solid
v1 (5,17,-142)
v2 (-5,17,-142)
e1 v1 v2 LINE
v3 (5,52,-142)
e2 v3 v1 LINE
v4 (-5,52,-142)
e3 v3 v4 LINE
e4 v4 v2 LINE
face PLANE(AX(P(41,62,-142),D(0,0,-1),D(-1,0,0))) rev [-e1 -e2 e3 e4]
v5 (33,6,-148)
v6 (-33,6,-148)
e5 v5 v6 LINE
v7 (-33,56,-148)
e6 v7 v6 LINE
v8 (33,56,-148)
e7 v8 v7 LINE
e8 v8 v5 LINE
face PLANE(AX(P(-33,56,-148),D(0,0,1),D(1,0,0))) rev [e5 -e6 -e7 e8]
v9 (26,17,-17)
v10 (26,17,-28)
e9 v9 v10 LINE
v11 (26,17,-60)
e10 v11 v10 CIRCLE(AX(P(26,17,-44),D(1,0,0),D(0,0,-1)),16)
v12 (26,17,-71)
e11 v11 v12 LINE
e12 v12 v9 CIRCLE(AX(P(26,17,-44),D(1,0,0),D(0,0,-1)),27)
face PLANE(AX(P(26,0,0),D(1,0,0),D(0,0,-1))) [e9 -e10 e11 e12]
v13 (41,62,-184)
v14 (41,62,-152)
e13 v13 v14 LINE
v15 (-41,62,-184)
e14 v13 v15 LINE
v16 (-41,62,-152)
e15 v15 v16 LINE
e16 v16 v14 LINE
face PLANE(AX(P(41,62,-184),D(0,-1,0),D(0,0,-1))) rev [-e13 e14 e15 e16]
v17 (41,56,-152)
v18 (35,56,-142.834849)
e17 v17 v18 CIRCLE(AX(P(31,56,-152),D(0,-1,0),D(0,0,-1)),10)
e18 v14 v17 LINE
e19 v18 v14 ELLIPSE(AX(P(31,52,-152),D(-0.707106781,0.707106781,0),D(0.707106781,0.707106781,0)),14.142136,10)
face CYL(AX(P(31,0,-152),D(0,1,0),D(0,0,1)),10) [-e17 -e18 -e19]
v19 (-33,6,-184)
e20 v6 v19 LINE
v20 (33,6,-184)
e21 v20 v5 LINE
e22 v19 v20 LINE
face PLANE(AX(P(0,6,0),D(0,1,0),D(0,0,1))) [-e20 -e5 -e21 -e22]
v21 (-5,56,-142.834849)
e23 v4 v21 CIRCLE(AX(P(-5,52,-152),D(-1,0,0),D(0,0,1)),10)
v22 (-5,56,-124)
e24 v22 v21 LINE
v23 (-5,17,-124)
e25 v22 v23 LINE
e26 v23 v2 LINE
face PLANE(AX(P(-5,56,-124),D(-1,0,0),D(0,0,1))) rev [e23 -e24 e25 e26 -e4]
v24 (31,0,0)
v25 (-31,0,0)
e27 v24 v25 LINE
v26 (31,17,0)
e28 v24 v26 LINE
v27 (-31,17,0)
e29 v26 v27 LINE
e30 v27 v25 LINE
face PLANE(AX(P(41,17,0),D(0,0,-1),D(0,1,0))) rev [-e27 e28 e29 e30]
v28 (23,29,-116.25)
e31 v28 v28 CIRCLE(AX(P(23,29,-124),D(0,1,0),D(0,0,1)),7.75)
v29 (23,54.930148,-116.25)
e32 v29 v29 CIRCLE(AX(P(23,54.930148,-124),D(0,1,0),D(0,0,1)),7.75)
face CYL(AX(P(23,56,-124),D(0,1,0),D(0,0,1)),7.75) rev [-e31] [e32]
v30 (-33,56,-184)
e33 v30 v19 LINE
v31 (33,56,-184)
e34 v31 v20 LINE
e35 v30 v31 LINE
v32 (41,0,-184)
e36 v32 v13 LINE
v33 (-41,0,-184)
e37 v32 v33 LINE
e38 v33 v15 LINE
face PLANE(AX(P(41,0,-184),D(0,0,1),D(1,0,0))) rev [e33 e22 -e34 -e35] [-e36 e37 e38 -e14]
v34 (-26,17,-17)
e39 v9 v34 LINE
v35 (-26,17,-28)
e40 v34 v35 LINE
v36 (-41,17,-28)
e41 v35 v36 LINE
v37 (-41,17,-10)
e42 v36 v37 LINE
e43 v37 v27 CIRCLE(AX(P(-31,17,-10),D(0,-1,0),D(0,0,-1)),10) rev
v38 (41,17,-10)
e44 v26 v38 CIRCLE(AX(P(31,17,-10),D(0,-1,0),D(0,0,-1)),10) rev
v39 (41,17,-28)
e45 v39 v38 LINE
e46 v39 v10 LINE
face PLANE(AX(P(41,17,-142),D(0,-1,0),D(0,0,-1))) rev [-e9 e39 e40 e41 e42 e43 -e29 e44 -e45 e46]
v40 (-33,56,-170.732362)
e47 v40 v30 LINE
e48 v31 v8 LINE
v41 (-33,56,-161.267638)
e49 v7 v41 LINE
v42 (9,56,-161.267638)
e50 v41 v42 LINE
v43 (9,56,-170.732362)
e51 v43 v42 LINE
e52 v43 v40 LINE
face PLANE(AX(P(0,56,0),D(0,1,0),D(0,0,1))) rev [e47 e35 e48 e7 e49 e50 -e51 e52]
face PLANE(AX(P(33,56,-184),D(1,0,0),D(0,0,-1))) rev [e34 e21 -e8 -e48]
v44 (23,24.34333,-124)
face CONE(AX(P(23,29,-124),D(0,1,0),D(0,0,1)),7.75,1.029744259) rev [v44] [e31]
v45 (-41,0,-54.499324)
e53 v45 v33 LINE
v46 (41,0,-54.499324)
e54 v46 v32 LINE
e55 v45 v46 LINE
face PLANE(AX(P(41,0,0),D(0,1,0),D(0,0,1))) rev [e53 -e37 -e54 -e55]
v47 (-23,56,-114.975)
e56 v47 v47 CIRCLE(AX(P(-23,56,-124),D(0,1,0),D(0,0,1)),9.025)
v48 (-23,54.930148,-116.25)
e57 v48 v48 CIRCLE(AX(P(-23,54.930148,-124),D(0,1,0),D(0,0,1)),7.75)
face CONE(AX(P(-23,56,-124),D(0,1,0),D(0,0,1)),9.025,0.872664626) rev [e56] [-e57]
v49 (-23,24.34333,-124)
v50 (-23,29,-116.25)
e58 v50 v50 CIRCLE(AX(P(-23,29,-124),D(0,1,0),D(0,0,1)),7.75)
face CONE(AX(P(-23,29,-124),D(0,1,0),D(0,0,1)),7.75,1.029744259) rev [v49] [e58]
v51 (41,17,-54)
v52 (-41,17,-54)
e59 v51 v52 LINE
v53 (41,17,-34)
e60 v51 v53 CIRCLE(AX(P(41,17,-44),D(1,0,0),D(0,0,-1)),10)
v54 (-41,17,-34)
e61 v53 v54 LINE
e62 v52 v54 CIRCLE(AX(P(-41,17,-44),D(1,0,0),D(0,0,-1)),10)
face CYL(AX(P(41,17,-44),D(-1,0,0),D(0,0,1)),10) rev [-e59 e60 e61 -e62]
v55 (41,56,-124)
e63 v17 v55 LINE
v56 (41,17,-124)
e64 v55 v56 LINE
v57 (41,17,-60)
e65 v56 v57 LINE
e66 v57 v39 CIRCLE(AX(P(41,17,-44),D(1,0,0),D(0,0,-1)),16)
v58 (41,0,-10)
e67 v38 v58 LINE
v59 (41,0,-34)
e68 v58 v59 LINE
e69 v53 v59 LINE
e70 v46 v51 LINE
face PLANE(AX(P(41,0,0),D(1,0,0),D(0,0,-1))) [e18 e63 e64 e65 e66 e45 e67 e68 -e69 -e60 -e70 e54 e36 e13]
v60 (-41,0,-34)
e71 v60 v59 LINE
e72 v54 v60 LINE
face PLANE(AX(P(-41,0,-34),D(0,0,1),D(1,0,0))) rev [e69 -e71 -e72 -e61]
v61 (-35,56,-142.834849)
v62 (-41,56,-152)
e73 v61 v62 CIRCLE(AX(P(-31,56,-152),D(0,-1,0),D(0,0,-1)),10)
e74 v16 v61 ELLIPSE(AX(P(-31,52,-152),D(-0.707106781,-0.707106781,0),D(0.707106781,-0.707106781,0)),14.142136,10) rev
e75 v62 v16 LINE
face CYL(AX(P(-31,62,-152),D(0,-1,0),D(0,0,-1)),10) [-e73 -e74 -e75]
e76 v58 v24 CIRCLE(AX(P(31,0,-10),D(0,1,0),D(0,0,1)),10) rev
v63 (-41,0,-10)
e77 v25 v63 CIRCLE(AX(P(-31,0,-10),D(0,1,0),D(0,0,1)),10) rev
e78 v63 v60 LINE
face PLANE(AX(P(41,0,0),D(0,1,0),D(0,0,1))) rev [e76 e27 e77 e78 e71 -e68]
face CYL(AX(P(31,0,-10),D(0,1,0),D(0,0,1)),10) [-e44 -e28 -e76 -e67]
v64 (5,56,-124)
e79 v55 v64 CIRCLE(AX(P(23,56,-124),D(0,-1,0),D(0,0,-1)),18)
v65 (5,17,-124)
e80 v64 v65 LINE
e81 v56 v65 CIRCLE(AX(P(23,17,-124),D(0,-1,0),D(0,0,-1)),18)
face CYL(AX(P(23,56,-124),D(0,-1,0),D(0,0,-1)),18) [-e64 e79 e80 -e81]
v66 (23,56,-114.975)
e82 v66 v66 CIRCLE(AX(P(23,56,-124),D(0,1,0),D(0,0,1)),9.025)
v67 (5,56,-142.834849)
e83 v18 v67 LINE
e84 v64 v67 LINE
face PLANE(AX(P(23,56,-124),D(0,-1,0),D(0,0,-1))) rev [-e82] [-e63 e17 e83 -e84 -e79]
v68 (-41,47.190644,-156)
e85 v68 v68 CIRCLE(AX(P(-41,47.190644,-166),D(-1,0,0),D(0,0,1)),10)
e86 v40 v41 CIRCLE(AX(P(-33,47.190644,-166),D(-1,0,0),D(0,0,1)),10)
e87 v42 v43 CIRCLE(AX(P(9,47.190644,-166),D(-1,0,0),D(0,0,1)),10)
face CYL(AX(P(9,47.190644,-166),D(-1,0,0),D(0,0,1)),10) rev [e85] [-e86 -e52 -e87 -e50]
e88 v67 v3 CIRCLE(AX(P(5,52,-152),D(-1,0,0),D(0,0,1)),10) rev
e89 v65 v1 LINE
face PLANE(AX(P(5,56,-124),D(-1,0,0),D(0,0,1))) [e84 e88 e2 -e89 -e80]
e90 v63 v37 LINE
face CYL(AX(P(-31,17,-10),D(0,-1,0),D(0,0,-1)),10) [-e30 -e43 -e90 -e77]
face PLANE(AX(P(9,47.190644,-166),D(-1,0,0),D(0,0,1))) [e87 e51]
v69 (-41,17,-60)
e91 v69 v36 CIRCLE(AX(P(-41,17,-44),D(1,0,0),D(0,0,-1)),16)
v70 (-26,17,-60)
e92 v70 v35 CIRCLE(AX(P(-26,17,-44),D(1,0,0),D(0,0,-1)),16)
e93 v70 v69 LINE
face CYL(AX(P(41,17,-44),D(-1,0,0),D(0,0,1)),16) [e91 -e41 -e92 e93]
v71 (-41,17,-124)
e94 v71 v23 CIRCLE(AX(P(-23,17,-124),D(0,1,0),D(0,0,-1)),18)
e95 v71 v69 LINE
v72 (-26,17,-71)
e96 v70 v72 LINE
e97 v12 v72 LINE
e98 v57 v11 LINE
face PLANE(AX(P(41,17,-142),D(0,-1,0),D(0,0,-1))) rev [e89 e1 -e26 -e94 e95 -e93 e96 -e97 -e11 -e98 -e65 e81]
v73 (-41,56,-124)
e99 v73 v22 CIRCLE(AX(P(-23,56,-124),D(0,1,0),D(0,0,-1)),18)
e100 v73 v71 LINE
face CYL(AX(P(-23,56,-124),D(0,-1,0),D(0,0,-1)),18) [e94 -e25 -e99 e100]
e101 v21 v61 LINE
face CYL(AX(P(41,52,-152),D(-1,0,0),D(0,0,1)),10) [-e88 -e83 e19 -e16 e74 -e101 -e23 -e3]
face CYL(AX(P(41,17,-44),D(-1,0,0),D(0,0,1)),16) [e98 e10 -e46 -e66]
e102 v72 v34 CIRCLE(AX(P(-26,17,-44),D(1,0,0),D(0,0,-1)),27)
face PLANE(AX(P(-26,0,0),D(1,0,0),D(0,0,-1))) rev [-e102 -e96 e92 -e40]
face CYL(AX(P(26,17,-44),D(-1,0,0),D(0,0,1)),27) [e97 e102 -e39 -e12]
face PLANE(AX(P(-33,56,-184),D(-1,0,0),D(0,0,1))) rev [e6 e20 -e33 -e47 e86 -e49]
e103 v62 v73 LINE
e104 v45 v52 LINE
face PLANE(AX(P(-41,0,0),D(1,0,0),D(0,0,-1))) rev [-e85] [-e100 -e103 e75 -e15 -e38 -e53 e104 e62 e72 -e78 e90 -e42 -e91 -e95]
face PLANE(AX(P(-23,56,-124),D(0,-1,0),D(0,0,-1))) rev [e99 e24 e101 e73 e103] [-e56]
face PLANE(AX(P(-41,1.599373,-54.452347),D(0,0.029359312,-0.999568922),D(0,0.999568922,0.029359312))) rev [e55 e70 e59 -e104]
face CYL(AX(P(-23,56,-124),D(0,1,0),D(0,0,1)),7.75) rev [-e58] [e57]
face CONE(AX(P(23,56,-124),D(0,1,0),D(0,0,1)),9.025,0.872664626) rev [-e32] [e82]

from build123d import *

# Parameters (mm, degrees)
BOSS_EXTRUDE2_DEPTH      = 41
BOSS_EXTRUDE4_DEPTH      = 39
BOSS_EXTRUDE6_DEPTH      = 41
BOSS_EXTRUDE6_DEPTH_BACK = 41
BOSS_EXTRUDE7_DEPTH      = 26
CUT_EXTRUDE1_DEPTH       = 211.770016843
CUT_EXTRUDE5_START       = -6
SKETCH12_W               = 66
SKETCH12_H               = 36
CUT_EXTRUDE5_DEPTH       = 50
FILLET1_R                = 10
SKETCH13_R               = 10
CUT_EXTRUDE6_DEPTH       = 50


with BuildPart() as part:
    # Sketch3 → Boss-Extrude2 (new, symmetric)
    with BuildSketch(Plane(origin=(0, 0, 0), x_dir=(0, 0, -1), z_dir=(1, 0, 0))):
        Polygon((0, 0), (184, 0), (184, 62), (142, 62), (142, 17), (0, 17), align=None)
    extrude(amount=BOSS_EXTRUDE2_DEPTH, both=True)

    # Sketch4 → Boss-Extrude4 (add)
    with BuildSketch(Plane(origin=(0, 17, 0), x_dir=(1, 0, 0), z_dir=(0, 1, 0))):
        with BuildLine():
            Line((41, 142), (41, 124))
            ThreePointArc((41, 124), (23, 106), (5, 124))
            Line((5, 124), (5, 142))
            Line((5, 142), (41, 142))
        make_face()
    boss_extrude4 = extrude(amount=BOSS_EXTRUDE4_DEPTH)

    # Sketch6 → M18 Tapped Hole1 (revolve, cut)
    with BuildSketch(Plane(origin=(23, 56, -124), x_dir=(0, 0, 1), z_dir=(1, 0, 0))):
        Polygon((0, 0), (0, 31.656669797), (7.75, 27), (7.75, 1.06985203), (9.025, 0), align=None)
    m18_tapped_hole1 = revolve(axis=Axis((23, 62.35, -124), (0, -1, 0)), mode=Mode.SUBTRACT)

    # Mirror1: Boss-Extrude4, M18 Tapped Hole1 across plane
    add(boss_extrude4.mirror(Plane(origin=(0, 0, 0), x_dir=(0, 0, 1), z_dir=(1, 0, 0))))
    add(m18_tapped_hole1.mirror(Plane(origin=(0, 0, 0), x_dir=(0, 0, 1), z_dir=(1, 0, 0))), mode=Mode.SUBTRACT)

    # Sketch10 → Boss-Extrude6 (add, two sides: drawn at the far end of the back side and taken through both)
    with BuildSketch(Plane(origin=(0, 0, 0), x_dir=(0, 0, -1), z_dir=(1, 0, 0)).offset(-BOSS_EXTRUDE6_DEPTH_BACK)):
        with BuildLine():
            ThreePointArc((60, 17), (44, 33), (28, 17))
            Line((28, 17), (34, 17))
            ThreePointArc((34, 17), (44, 27), (54, 17))
            Line((54, 17), (60, 17))
        make_face()
    extrude(amount=BOSS_EXTRUDE6_DEPTH + BOSS_EXTRUDE6_DEPTH_BACK)

    # Sketch10<3> → Boss-Extrude7 (add, symmetric)
    with BuildSketch(Plane(origin=(0, 0, 0), x_dir=(0, 0, -1), z_dir=(1, 0, 0))):
        with BuildLine():
            ThreePointArc((71, 17), (44, 44), (17, 17))
            Line((17, 17), (28, 17))
            ThreePointArc((28, 17), (44, 33), (60, 17))
            Line((60, 17), (71, 17))
        make_face()
    extrude(amount=BOSS_EXTRUDE7_DEPTH, both=True)

    # Sketch11 → Cut-Extrude1 (cut, through all)
    with BuildSketch(Plane(origin=(41, 0, 0), x_dir=(0, 0, -1), z_dir=(1, 0, 0))):
        Polygon((54, 17), (34, 17), (34, 0), (54.499323558, 0), align=None)
        with BuildLine():
            ThreePointArc((54, 17), (44, 26.710592894), (34, 17))
            Line((34, 17), (54, 17))
        make_face()
    extrude(amount=-CUT_EXTRUDE1_DEPTH, mode=Mode.SUBTRACT)

    # Sketch12 → Cut-Extrude5 (cut)
    with BuildSketch(Plane.XZ.offset(CUT_EXTRUDE5_START)):
        with Locations((0, -166)):
            Rectangle(SKETCH12_W, SKETCH12_H)
    extrude(amount=-CUT_EXTRUDE5_DEPTH, mode=Mode.SUBTRACT)

    # Fillet1
    # the kernel refuses this fillet: 10 mm, written as the material it takes off along each edge
    with BuildSketch(Plane(origin=(-66, 62, -142), x_dir=(0, -1, 0), z_dir=(1, 0, 0))) as fillet1_piece_1_section:
        with BuildLine():
            CenterArc((FILLET1_R, FILLET1_R), FILLET1_R, 180, 90)
            Line((0, FILLET1_R), (0, 0))
            Line((0, 0), (FILLET1_R, 0))
        make_face()
    fillet1_piece_1 = extrude(amount=132, mode=Mode.PRIVATE)
    fillet1_piece_1 = split(fillet1_piece_1, bisect_by=Plane(origin=(-35.5, 56, -144.437451755), z_dir=(0, 1, 0)), keep=Keep.TOP, mode=Mode.PRIVATE)
    fillet1_piece_1 = split(fillet1_piece_1, bisect_by=Plane(origin=(-5, 60.149499364, -144.437451755), z_dir=(-1, 0, 0)), keep=Keep.TOP, mode=Mode.PRIVATE)
    add(fillet1_piece_1, mode=Mode.SUBTRACT)
    with BuildSketch(Plane(origin=(-66, 62, -142), x_dir=(0, -1, 0), z_dir=(1, 0, 0))) as fillet1_piece_2_section:
        with BuildLine():
            CenterArc((FILLET1_R, FILLET1_R), FILLET1_R, 180, 90)
            Line((0, FILLET1_R), (0, 0))
            Line((0, 0), (FILLET1_R, 0))
        make_face()
    fillet1_piece_2 = extrude(amount=132, mode=Mode.PRIVATE)
    fillet1_piece_2 = split(fillet1_piece_2, bisect_by=Plane(origin=(0, 56, -142.10131848), z_dir=(0, -1, 0)), keep=Keep.TOP, mode=Mode.PRIVATE)
    fillet1_piece_2 = split(fillet1_piece_2, bisect_by=Plane(origin=(5, 54.582513339, -142.10131848), z_dir=(-1, 0, 0)), keep=Keep.TOP, mode=Mode.PRIVATE)
    fillet1_piece_2 = split(fillet1_piece_2, bisect_by=Plane(origin=(-5, 54.582513339, -142.10131848), z_dir=(1, 0, 0)), keep=Keep.TOP, mode=Mode.PRIVATE)
    add(fillet1_piece_2, mode=Mode.SUBTRACT)
    with BuildSketch(Plane(origin=(-66, 62, -142), x_dir=(0, -1, 0), z_dir=(1, 0, 0))) as fillet1_piece_3_section:
        with BuildLine():
            CenterArc((FILLET1_R, FILLET1_R), FILLET1_R, 180, 90)
            Line((0, FILLET1_R), (0, 0))
            Line((0, 0), (FILLET1_R, 0))
        make_face()
    fillet1_piece_3 = extrude(amount=132, mode=Mode.PRIVATE)
    fillet1_piece_3 = split(fillet1_piece_3, bisect_by=Plane(origin=(0, 56, -144.437451755), z_dir=(0, 1, 0)), keep=Keep.TOP, mode=Mode.PRIVATE)
    fillet1_piece_3 = split(fillet1_piece_3, bisect_by=Plane(origin=(5, 60.149499364, -144.437451755), z_dir=(-1, 0, 0)), keep=Keep.TOP, mode=Mode.PRIVATE)
    fillet1_piece_3 = split(fillet1_piece_3, bisect_by=Plane(origin=(-5, 60.149499364, -144.437451755), z_dir=(1, 0, 0)), keep=Keep.TOP, mode=Mode.PRIVATE)
    add(fillet1_piece_3, mode=Mode.SUBTRACT)
    with BuildSketch(Plane(origin=(-66, 62, -142), x_dir=(0, -1, 0), z_dir=(1, 0, 0))) as fillet1_piece_4_section:
        with BuildLine():
            CenterArc((FILLET1_R, FILLET1_R), FILLET1_R, 180, 90)
            Line((0, FILLET1_R), (0, 0))
            Line((0, 0), (FILLET1_R, 0))
        make_face()
    fillet1_piece_4 = extrude(amount=132, mode=Mode.PRIVATE)
    fillet1_piece_4 = split(fillet1_piece_4, bisect_by=Plane(origin=(35.5, 56, -144.437451755), z_dir=(0, 1, 0)), keep=Keep.TOP, mode=Mode.PRIVATE)
    fillet1_piece_4 = split(fillet1_piece_4, bisect_by=Plane(origin=(5, 60.149499364, -144.437451755), z_dir=(1, 0, 0)), keep=Keep.TOP, mode=Mode.PRIVATE)
    add(fillet1_piece_4, mode=Mode.SUBTRACT)
    with BuildSketch(Plane(origin=(41, 87, -142), x_dir=(0, 0, -1), z_dir=(0, -1, 0))) as fillet1_piece_5:
        with BuildLine():
            CenterArc((FILLET1_R, -FILLET1_R), FILLET1_R, 90, 90)
            Line((0, -FILLET1_R), (0, 0))
            Line((0, 0), (FILLET1_R, 0))
        make_face()
    extrude(amount=31, mode=Mode.SUBTRACT)
    with BuildSketch(Plane(origin=(-41, 87, -142), x_dir=(0, 0, -1), z_dir=(0, -1, 0))) as fillet1_piece_6:
        with BuildLine():
            CenterArc((FILLET1_R, FILLET1_R), FILLET1_R, 180, 90)
            Line((0, FILLET1_R), (0, 0))
            Line((0, 0), (FILLET1_R, 0))
        make_face()
    extrude(amount=31, mode=Mode.SUBTRACT)
    with BuildSketch(Plane(origin=(-41, 42, 0), x_dir=(1, 0, 0), z_dir=(0, -1, 0))) as fillet1_piece_7:
        with BuildLine():
            CenterArc((FILLET1_R, -FILLET1_R), FILLET1_R, 90, 90)
            Line((0, -FILLET1_R), (0, 0))
            Line((0, 0), (FILLET1_R, 0))
        make_face()
    extrude(amount=67, mode=Mode.SUBTRACT)
    with BuildSketch(Plane(origin=(41, 42, 0), x_dir=(-1, 0, 0), z_dir=(0, -1, 0))) as fillet1_piece_8:
        with BuildLine():
            CenterArc((FILLET1_R, FILLET1_R), FILLET1_R, 180, 90)
            Line((0, FILLET1_R), (0, 0))
            Line((0, 0), (FILLET1_R, 0))
        make_face()
    extrude(amount=67, mode=Mode.SUBTRACT)

    # Sketch13 → Cut-Extrude6 (cut)
    with BuildSketch(Plane.ZY.offset(41)):
        with Locations((-166, 47.190644355)):
            Circle(SKETCH13_R)
    extrude(amount=-CUT_EXTRUDE6_DEPTH, mode=Mode.SUBTRACT)


solid = part.part
